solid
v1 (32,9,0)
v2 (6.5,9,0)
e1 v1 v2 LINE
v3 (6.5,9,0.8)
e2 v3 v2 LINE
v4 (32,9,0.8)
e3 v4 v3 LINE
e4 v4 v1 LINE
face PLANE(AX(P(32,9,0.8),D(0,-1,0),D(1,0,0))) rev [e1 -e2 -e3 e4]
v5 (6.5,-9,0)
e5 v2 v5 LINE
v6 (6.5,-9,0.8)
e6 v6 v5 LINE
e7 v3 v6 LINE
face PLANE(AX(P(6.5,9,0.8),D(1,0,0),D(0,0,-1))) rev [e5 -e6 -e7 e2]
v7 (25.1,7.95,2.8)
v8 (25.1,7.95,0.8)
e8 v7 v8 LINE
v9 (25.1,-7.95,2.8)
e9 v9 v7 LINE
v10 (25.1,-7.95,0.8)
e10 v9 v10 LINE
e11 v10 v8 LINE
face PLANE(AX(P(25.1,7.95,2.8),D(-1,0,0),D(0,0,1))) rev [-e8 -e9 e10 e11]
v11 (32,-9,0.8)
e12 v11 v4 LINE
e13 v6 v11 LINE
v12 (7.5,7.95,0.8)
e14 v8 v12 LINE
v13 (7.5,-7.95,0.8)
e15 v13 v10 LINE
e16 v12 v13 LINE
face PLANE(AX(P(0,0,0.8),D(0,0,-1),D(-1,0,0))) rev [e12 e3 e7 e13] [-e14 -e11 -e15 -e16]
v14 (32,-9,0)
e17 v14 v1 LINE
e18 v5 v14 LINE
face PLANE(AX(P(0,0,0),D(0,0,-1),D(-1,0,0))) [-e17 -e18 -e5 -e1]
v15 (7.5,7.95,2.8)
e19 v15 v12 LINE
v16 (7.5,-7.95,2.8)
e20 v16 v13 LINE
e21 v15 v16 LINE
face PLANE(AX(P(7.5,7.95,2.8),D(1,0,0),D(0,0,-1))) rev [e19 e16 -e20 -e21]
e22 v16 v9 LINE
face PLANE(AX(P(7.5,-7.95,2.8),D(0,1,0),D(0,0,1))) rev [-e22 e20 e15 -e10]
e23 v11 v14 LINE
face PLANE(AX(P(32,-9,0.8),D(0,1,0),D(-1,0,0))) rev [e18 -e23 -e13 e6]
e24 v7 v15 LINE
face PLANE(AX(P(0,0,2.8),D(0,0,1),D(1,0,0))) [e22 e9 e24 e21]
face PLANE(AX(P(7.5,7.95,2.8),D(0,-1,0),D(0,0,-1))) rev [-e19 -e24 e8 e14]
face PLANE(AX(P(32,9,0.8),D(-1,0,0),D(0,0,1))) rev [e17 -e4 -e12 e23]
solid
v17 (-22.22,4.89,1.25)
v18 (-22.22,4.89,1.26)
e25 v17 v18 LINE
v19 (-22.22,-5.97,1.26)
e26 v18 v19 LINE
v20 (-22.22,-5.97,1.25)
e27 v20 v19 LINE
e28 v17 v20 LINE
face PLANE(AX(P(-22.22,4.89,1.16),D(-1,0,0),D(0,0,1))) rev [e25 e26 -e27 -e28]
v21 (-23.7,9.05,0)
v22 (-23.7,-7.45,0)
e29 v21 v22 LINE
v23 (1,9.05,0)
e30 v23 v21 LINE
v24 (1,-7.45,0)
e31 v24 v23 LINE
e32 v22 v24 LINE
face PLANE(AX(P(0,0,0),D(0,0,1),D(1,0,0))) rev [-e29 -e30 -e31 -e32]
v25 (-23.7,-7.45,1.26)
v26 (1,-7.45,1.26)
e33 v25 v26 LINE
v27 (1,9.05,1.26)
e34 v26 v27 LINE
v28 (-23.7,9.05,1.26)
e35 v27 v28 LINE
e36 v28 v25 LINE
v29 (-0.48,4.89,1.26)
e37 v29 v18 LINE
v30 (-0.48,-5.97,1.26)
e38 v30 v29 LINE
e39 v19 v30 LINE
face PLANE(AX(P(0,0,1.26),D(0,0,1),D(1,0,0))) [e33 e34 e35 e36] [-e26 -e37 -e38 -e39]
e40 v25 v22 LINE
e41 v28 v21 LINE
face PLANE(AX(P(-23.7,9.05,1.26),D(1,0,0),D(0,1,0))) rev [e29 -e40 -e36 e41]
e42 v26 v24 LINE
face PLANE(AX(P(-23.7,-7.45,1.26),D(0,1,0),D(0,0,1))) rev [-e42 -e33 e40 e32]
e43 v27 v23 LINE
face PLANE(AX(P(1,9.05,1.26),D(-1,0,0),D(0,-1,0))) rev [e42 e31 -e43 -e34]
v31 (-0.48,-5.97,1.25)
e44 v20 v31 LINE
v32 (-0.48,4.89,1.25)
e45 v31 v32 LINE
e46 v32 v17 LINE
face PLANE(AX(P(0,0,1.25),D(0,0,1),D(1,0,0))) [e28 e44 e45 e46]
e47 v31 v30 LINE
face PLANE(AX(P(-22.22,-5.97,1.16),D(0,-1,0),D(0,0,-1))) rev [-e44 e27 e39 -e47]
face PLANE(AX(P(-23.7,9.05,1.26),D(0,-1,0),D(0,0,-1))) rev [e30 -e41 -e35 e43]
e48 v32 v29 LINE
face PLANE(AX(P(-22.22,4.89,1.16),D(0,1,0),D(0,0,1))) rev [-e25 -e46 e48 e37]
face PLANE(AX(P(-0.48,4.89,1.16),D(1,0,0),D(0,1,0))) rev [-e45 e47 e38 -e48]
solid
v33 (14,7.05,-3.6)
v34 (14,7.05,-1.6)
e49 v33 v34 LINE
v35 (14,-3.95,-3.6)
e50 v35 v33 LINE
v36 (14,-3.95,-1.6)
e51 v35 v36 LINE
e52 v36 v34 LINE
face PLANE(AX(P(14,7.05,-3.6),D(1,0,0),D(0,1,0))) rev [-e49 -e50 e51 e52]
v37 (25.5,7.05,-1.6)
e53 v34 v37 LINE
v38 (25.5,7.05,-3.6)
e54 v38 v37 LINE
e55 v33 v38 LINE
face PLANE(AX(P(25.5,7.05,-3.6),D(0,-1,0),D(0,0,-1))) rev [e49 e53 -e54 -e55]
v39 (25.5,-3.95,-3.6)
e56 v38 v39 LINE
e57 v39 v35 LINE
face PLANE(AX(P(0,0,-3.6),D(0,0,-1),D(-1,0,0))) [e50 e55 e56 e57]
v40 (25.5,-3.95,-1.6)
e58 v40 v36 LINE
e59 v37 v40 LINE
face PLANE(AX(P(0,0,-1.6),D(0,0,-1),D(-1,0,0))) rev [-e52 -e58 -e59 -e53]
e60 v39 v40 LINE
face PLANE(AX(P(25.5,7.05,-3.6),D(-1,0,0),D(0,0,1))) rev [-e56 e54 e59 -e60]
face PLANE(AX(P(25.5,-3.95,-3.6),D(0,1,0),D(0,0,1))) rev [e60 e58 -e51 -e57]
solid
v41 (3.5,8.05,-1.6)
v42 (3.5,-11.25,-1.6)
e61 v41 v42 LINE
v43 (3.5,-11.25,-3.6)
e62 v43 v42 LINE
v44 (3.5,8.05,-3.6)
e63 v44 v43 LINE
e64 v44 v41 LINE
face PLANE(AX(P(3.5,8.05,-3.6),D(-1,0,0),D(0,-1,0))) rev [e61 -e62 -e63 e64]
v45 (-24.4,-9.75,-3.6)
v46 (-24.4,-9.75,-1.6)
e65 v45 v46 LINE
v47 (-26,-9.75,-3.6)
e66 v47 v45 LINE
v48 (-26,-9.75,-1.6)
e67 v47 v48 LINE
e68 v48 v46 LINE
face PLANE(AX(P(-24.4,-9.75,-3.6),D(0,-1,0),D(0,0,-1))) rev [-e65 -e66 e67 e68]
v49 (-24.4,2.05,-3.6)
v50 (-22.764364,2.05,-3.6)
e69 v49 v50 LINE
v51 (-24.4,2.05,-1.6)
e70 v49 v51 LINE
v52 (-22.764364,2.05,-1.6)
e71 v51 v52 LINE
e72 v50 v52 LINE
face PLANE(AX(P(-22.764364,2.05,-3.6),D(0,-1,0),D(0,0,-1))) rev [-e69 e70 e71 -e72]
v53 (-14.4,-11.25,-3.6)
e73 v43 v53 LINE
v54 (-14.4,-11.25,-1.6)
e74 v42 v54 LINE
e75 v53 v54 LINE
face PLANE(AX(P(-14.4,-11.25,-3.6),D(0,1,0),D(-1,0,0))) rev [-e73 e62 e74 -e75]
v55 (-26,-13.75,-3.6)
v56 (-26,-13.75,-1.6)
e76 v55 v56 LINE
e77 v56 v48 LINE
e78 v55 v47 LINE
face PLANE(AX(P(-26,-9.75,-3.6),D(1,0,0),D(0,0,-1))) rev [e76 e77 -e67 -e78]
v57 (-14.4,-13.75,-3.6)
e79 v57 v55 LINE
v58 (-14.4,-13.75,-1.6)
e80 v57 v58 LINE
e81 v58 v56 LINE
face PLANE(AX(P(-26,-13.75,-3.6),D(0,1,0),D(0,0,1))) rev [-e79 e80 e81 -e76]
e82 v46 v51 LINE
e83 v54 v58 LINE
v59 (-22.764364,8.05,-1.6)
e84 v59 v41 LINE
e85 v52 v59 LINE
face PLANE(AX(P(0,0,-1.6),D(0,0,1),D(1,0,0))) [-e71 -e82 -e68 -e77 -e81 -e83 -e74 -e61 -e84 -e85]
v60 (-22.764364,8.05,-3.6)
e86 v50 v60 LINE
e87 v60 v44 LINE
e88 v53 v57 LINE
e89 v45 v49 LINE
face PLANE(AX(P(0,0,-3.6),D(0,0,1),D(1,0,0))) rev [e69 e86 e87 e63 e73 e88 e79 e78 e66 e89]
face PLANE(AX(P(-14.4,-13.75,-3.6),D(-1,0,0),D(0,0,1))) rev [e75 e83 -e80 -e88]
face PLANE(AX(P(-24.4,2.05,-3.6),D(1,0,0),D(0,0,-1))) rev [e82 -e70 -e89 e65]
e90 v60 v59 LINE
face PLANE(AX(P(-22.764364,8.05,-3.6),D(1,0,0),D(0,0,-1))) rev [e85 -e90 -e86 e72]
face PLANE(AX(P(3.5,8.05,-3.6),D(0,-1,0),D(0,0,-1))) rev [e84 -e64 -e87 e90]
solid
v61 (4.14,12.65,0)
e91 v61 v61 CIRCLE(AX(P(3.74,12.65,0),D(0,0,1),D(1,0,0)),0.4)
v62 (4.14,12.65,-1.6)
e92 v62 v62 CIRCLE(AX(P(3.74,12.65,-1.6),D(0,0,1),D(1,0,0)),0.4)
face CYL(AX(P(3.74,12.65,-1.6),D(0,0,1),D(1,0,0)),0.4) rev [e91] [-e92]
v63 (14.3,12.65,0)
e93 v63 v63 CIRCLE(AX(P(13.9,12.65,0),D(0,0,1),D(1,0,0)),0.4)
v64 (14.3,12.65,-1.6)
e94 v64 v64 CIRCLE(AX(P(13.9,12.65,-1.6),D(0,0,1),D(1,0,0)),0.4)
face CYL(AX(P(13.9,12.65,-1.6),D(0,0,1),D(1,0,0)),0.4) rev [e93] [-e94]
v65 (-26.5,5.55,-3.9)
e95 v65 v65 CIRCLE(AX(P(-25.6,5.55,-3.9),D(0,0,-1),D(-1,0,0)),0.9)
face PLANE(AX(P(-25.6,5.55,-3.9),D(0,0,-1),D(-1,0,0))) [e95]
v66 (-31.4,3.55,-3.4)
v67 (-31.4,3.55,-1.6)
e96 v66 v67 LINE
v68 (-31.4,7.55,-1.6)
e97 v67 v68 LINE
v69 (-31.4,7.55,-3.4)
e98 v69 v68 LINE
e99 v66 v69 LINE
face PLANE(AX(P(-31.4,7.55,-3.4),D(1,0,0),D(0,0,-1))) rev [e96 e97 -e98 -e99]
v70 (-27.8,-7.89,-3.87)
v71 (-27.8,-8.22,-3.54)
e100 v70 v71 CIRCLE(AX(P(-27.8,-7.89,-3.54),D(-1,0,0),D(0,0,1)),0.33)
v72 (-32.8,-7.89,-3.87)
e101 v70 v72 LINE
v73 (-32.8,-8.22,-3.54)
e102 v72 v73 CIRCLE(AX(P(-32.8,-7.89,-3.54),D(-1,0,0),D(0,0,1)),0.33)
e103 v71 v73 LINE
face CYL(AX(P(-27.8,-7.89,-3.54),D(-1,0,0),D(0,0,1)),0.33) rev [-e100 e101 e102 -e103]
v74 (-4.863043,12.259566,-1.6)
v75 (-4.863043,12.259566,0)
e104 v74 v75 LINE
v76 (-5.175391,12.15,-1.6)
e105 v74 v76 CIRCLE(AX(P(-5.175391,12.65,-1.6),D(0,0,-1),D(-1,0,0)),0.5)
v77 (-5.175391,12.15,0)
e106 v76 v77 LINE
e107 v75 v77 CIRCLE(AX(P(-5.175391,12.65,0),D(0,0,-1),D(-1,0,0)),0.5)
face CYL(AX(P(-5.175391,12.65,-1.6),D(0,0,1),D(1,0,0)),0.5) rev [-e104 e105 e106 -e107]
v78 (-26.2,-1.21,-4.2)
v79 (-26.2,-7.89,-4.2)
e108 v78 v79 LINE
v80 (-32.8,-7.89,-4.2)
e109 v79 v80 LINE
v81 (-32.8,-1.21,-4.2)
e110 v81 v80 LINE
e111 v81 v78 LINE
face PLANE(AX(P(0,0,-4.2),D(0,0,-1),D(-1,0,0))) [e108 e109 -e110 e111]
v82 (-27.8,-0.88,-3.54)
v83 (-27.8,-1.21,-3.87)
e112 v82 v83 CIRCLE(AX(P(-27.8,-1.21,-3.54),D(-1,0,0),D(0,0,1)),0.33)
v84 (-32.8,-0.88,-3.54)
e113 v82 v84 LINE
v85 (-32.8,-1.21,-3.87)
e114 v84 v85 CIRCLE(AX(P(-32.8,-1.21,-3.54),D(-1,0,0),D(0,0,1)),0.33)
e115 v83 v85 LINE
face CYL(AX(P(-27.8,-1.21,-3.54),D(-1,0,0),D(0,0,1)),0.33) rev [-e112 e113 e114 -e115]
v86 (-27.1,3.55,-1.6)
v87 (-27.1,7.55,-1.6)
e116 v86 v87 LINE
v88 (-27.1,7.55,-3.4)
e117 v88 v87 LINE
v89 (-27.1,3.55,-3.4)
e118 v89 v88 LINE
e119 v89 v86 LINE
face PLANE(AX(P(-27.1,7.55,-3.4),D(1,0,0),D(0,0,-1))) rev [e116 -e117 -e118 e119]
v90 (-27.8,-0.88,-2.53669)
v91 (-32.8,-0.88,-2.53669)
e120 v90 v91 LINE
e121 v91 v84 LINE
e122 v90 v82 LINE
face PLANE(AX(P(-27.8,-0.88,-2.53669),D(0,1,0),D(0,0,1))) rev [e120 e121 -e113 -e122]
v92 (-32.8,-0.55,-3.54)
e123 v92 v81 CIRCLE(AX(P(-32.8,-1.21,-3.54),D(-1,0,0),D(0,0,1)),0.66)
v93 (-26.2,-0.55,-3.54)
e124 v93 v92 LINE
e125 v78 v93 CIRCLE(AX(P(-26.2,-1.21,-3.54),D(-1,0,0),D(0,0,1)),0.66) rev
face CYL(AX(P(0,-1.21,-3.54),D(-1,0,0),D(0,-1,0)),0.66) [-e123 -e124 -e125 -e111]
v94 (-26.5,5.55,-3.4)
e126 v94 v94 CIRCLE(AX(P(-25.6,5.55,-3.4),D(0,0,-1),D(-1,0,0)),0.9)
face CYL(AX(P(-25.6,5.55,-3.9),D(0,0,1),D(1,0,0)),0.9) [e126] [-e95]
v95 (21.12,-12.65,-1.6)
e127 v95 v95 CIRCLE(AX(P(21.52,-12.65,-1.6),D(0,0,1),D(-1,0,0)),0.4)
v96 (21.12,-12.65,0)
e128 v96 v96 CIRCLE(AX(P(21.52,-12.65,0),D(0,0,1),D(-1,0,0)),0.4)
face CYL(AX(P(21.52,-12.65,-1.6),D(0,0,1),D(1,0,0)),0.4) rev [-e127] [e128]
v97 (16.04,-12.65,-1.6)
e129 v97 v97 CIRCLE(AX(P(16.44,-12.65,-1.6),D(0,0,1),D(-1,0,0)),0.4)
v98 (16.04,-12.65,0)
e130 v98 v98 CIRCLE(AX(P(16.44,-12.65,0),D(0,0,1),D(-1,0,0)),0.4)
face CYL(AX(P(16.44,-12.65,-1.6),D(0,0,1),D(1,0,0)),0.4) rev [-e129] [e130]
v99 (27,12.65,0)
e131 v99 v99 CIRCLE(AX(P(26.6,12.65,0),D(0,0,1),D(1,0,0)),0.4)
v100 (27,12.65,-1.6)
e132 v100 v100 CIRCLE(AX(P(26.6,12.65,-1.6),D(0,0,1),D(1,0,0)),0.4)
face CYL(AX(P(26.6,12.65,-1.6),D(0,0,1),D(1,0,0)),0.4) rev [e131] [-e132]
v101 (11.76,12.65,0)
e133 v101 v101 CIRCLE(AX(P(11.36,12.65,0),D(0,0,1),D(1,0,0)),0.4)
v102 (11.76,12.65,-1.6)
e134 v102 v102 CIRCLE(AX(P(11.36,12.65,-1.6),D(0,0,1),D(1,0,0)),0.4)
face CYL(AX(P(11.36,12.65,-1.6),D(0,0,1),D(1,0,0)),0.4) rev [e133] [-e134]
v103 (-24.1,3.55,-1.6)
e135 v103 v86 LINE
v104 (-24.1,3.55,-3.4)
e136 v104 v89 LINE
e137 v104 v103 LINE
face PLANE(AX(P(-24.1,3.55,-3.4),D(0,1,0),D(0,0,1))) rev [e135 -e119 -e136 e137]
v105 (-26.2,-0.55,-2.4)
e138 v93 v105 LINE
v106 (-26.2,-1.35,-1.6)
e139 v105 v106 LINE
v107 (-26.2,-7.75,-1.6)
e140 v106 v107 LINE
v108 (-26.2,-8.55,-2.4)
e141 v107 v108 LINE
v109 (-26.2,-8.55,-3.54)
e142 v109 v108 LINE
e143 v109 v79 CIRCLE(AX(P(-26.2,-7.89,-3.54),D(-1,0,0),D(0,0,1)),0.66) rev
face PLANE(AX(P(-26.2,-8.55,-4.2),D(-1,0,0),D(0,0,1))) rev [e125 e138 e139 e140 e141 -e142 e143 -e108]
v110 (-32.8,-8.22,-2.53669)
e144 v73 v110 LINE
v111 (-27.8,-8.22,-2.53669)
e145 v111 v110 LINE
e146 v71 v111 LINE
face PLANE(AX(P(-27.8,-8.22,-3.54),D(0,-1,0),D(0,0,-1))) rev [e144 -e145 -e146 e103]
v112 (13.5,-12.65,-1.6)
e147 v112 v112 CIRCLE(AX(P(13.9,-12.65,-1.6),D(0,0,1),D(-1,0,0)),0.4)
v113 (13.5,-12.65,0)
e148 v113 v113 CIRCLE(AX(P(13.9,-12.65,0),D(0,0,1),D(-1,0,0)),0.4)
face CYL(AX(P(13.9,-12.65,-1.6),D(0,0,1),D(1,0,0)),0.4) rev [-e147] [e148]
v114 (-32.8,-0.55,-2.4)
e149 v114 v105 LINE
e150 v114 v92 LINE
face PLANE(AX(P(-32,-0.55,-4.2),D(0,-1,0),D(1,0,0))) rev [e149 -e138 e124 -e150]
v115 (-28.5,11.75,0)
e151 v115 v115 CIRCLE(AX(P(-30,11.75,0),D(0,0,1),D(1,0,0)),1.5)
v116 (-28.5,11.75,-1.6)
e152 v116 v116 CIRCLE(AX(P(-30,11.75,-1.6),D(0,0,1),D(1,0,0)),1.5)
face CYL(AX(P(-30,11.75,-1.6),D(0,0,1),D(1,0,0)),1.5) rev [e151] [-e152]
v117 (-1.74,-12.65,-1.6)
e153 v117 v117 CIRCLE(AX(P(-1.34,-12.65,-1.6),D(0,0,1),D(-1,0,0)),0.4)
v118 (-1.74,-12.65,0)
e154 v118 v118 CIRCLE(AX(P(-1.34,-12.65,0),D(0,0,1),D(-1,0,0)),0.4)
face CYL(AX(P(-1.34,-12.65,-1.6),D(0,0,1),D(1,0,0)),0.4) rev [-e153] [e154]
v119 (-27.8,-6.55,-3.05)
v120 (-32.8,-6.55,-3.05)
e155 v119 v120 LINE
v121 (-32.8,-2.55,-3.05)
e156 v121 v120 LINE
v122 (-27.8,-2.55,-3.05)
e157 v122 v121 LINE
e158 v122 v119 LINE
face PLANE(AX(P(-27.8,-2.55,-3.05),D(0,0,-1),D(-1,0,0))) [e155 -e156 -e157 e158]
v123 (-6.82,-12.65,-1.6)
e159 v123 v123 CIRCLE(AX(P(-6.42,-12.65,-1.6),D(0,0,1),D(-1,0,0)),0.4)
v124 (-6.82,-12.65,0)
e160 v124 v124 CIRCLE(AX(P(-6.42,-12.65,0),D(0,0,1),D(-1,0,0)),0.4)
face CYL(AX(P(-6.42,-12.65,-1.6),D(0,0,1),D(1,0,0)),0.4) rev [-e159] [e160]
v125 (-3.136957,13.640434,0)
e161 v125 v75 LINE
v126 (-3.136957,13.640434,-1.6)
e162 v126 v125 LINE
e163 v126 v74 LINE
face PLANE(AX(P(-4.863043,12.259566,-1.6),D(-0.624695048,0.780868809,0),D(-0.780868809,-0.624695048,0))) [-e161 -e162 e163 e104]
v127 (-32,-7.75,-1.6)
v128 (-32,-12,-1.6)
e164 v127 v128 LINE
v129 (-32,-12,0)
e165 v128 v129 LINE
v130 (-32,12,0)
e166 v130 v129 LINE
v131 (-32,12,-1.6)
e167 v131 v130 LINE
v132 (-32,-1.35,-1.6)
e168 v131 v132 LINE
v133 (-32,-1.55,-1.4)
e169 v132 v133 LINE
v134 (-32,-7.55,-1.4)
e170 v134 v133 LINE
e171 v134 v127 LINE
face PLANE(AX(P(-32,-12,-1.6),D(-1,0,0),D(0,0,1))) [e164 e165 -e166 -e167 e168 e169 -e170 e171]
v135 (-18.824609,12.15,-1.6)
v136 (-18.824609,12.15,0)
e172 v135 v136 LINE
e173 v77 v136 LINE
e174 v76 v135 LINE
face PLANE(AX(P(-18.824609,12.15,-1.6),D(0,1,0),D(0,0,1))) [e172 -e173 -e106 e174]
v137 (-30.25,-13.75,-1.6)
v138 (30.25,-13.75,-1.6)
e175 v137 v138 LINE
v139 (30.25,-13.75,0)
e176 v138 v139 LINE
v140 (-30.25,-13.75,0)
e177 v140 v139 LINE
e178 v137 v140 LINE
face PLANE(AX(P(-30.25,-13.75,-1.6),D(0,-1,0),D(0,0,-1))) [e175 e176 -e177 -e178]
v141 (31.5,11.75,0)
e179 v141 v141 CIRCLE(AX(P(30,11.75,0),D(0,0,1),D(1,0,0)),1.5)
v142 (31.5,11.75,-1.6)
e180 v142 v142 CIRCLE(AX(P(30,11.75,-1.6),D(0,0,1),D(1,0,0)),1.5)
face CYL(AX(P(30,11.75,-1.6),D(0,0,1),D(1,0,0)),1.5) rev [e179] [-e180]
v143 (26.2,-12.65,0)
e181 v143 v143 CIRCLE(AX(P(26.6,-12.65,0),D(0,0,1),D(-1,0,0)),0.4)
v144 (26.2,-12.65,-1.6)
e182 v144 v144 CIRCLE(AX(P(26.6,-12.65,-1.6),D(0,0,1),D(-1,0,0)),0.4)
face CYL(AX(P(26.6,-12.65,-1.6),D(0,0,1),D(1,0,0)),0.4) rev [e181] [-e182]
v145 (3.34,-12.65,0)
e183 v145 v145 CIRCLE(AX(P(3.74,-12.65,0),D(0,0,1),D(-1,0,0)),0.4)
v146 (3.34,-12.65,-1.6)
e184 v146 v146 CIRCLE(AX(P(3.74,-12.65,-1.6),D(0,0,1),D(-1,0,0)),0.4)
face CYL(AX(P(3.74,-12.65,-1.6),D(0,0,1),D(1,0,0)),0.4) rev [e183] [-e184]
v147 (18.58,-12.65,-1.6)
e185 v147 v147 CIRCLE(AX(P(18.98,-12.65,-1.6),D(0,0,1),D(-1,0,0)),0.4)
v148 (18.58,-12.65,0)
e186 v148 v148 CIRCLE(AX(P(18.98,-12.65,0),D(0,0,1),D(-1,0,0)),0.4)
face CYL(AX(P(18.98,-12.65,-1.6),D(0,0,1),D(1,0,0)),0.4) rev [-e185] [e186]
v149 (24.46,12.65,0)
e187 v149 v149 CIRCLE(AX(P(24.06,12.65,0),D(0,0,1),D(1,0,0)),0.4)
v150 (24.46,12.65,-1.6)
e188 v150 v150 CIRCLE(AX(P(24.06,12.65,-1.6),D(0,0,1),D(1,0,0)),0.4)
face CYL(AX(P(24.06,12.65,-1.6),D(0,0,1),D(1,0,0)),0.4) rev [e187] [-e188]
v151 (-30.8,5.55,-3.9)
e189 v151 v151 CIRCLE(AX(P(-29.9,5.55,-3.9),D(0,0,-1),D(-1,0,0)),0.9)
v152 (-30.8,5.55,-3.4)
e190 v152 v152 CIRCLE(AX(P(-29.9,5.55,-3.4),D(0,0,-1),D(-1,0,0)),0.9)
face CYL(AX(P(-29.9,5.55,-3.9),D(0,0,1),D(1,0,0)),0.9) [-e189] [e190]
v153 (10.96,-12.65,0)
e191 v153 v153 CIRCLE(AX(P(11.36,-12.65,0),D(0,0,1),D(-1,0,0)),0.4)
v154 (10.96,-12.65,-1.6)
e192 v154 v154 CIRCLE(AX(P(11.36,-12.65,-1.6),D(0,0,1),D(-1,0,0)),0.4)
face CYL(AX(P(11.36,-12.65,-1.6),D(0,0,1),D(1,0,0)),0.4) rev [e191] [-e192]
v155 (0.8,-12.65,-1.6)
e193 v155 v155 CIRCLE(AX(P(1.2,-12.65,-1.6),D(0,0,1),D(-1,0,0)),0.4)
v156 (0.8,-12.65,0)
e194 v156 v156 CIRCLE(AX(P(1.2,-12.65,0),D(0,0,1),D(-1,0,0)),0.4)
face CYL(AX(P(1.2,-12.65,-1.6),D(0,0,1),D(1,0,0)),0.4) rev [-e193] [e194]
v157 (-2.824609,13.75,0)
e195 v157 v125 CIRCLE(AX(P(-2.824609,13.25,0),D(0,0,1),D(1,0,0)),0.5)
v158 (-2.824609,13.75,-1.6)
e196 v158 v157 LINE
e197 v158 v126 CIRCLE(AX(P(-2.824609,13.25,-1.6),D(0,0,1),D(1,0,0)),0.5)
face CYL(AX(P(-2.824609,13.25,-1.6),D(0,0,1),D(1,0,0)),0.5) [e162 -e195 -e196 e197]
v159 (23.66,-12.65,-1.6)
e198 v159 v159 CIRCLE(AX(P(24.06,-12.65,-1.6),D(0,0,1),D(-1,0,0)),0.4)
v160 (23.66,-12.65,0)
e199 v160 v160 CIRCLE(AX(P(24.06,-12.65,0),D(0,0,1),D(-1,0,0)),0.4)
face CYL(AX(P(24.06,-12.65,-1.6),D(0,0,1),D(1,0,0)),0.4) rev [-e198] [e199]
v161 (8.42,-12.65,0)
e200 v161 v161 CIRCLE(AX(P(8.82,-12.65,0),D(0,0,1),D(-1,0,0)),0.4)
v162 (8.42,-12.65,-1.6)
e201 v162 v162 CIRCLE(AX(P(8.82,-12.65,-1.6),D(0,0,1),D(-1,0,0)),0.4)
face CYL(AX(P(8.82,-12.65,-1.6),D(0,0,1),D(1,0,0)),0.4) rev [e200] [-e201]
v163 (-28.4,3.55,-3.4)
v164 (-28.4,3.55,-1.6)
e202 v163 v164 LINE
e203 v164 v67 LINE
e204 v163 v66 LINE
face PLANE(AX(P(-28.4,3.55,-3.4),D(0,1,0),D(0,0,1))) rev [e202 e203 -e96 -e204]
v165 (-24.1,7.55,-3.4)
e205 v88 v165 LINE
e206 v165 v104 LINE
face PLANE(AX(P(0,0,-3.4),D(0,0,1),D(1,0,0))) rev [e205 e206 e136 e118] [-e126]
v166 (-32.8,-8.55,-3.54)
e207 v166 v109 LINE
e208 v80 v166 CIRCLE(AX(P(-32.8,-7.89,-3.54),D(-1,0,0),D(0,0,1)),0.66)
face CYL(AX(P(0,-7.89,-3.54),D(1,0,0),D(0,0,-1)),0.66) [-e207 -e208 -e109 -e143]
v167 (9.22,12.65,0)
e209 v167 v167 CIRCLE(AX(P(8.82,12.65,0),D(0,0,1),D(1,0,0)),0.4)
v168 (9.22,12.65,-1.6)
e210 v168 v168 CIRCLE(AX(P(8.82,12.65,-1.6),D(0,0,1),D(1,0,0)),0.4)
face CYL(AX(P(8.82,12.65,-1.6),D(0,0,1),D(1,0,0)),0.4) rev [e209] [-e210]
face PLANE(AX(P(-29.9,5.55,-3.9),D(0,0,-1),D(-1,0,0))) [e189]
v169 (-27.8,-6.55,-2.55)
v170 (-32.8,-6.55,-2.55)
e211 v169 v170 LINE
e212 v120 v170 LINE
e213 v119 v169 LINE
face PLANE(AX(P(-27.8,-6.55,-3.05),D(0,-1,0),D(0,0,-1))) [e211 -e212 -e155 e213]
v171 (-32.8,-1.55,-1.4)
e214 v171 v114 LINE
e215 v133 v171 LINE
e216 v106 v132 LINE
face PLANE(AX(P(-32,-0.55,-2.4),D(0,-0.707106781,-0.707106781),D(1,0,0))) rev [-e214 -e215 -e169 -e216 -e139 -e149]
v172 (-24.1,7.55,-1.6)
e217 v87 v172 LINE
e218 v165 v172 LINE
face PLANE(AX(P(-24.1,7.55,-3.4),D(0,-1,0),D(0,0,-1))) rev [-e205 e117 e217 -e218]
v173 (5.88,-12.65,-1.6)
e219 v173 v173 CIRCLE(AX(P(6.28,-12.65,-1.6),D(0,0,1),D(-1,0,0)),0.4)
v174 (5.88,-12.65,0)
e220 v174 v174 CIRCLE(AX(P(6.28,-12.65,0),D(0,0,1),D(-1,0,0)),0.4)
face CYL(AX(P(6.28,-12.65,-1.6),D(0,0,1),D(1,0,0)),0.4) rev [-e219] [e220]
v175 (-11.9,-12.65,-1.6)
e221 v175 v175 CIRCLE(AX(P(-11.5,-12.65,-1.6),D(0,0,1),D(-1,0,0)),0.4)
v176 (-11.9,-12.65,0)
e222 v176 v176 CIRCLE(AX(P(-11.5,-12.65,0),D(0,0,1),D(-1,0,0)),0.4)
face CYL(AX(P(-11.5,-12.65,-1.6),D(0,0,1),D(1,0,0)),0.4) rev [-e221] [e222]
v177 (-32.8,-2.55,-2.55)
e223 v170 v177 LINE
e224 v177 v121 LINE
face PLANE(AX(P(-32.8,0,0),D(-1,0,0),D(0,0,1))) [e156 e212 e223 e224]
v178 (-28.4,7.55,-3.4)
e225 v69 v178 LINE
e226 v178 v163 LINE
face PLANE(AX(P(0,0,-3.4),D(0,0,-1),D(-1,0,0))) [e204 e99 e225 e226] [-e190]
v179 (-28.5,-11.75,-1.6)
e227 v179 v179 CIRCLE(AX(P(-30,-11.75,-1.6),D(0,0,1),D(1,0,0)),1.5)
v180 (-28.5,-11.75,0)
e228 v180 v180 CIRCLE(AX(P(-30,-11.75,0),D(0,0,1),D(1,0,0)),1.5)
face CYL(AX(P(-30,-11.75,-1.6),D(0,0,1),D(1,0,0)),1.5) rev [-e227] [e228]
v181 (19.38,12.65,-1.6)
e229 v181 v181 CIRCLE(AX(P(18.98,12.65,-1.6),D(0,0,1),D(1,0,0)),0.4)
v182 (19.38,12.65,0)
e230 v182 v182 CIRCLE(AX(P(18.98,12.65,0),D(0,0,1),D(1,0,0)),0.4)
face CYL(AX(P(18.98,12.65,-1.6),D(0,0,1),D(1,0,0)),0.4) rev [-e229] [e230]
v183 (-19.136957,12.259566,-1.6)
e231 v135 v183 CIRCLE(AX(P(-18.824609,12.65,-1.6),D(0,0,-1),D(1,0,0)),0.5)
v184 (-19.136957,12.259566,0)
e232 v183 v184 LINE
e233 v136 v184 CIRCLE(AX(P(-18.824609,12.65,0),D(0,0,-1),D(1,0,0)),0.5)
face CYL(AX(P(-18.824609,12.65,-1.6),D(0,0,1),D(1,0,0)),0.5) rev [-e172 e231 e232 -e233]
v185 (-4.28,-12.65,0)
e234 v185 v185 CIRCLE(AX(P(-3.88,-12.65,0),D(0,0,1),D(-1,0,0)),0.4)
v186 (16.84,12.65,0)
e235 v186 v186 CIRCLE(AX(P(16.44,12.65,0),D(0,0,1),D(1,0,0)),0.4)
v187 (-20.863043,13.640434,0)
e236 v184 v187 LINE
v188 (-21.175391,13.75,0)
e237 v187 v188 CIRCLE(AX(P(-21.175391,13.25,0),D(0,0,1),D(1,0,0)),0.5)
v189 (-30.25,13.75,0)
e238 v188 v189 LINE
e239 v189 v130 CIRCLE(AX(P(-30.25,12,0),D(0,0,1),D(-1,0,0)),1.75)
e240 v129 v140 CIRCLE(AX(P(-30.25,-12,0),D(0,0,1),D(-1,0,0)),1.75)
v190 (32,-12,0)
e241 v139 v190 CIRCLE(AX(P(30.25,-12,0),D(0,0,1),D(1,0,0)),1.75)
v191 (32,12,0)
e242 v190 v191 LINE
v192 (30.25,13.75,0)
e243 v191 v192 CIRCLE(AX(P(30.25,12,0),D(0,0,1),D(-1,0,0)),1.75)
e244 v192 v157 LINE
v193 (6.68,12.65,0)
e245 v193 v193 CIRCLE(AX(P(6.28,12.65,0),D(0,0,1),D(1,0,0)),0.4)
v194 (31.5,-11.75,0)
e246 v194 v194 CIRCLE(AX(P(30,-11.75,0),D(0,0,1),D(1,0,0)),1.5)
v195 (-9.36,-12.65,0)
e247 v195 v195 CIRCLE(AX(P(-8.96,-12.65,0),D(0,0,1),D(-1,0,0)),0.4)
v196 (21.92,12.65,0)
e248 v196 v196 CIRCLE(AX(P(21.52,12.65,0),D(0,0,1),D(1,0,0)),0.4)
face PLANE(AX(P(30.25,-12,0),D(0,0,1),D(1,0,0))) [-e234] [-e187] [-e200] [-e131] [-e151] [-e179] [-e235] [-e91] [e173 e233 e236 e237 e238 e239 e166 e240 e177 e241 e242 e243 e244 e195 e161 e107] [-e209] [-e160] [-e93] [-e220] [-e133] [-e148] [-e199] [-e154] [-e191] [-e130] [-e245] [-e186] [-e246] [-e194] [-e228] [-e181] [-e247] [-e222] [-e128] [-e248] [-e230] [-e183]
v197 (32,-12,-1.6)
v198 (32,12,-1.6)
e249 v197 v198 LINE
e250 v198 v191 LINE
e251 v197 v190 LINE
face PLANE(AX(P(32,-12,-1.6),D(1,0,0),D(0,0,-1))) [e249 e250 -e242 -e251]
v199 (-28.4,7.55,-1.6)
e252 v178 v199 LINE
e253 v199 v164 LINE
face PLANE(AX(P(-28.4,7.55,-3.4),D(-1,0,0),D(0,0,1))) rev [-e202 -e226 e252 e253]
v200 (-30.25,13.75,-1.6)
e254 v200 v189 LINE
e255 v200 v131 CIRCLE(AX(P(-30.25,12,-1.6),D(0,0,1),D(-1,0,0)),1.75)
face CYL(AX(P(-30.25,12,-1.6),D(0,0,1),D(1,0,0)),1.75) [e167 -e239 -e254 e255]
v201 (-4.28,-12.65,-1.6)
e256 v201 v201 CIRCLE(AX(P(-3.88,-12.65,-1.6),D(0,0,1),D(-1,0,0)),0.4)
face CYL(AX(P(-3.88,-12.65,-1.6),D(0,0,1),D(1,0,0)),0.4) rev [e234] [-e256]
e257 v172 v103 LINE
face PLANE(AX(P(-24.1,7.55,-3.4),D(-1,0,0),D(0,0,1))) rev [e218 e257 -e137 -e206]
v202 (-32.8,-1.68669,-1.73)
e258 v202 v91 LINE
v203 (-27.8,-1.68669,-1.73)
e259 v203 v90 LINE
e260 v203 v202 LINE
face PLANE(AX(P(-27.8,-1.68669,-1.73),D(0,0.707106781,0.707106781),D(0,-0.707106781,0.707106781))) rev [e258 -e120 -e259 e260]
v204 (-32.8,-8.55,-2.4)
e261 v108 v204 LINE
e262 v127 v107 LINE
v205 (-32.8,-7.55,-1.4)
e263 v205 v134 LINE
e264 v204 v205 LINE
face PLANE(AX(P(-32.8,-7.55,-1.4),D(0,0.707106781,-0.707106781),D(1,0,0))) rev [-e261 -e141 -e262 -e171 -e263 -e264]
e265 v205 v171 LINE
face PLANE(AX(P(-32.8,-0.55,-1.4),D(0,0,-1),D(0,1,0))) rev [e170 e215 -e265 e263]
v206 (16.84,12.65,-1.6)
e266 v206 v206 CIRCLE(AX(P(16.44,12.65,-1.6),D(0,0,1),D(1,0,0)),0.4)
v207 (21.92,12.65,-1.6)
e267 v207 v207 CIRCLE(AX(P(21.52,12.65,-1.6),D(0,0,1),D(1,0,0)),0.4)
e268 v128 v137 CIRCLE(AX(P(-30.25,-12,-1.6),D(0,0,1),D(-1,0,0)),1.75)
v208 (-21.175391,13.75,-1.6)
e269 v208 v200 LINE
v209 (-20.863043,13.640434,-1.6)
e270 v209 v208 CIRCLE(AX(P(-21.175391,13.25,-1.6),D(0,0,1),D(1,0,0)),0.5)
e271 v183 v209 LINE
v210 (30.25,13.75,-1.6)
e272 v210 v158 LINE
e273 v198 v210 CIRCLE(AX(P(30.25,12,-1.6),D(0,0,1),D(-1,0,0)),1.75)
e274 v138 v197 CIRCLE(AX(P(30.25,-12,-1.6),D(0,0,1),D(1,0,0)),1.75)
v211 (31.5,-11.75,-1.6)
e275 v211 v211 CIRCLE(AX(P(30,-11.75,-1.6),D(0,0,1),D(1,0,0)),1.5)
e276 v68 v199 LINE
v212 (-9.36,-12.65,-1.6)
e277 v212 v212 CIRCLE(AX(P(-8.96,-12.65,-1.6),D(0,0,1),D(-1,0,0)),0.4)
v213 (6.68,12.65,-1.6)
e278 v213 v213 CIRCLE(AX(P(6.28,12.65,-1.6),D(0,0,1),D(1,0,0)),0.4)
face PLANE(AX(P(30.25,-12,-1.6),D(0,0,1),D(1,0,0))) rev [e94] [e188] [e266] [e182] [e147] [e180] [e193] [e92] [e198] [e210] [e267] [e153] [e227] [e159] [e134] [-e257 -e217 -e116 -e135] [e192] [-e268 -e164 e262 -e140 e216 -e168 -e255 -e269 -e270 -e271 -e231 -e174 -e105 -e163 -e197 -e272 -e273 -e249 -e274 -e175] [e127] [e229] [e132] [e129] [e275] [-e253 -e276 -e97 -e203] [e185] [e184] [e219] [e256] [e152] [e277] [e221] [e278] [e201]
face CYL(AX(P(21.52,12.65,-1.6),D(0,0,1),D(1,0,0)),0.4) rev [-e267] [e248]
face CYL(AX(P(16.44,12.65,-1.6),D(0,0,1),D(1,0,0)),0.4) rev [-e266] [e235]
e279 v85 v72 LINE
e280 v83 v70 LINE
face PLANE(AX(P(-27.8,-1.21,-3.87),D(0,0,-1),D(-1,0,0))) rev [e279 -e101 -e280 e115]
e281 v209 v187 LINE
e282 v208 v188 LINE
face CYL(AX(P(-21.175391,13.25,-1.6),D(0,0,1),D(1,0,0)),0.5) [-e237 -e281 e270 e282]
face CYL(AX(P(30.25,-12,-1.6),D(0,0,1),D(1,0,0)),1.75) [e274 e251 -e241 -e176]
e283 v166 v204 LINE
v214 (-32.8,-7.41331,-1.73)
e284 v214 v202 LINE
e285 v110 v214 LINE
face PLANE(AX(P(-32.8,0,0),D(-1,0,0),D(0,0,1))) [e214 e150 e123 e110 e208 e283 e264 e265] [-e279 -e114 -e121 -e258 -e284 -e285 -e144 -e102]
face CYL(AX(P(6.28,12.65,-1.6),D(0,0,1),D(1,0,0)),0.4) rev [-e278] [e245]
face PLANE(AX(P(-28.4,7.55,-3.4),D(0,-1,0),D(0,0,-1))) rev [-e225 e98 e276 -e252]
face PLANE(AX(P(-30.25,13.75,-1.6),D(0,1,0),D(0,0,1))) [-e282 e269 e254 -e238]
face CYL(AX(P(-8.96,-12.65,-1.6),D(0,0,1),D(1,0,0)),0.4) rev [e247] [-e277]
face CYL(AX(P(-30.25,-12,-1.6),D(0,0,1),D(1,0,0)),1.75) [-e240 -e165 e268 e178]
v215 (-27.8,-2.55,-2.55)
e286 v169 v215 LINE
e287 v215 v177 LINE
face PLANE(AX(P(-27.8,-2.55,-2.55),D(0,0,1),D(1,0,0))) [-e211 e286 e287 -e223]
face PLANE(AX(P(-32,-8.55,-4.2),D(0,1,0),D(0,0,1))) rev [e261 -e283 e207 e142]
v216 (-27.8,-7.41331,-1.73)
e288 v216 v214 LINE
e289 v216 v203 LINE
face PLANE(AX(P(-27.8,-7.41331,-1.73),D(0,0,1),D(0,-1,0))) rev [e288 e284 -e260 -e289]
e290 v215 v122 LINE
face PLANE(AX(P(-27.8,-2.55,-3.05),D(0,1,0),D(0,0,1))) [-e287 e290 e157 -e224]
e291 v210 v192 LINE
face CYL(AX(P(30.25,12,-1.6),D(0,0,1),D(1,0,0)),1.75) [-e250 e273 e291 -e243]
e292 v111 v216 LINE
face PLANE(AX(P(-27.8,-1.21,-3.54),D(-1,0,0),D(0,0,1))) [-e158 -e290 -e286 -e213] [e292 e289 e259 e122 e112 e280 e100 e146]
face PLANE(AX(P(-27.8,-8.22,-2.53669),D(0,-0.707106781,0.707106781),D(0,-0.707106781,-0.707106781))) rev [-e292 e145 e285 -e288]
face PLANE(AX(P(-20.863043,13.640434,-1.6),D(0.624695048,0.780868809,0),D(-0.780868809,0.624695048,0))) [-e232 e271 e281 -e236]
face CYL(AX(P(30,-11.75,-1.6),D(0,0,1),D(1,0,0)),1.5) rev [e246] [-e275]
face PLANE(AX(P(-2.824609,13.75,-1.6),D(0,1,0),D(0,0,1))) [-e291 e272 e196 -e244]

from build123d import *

# Parameters (mm, degrees)
ESQUISSE1_R             = 1.5
ESQUISSE1_R_2           = 0.4
BOSS_EXTRU_1_DEPTH      = 1.6
ESQUISSE2_W             = 25.5
ESQUISSE2_H             = 18
BOSS_EXTRU_2_DEPTH      = 0.8
ESQUISSE3_W             = 17.6
ESQUISSE3_H             = 15.9
BOSS_EXTRU_3_DEPTH      = 2
ESQUISSE4_W             = 24.7
ESQUISSE4_H             = 16.5
BOSS_EXTRU_4_DEPTH      = 1.26
ESQUISSE5_W             = 21.74
ESQUISSE5_H             = 10.86
ENL_V_MAT_EXTRU_1_DEPTH = 0.1
D_PLACER_LA_FACE2_BY    = 0.09
ESQUISSE7_W             = 5.8
ESQUISSE7_H             = 8
BOSS_EXTRU_5_DEPTH      = 2.6
ESQUISSE8_W             = 2.8
ESQUISSE8_H             = 8
BOSS_EXTRU_6_DEPTH      = 0.8
CONG_1_R                = 0.66
ESQUISSE9_W             = 0.5
ESQUISSE9_H             = 4
ENL_V_MAT_EXTRU_2_DEPTH = 5
ESQUISSE10_W            = 3
ESQUISSE10_H            = 4
BOSS_EXTRU_7_DEPTH      = 1.8
ESQUISSE11_R            = 0.9
BOSS_EXTRU_8_DEPTH      = 0.5
BOSS_EXTRU_9_DEPTH      = 2
ESQUISSE12_W            = 11.5
ESQUISSE12_H            = 11
BOSS_EXTRU_9_2_DEPTH    = 2


with BuildPart() as part:
    # Esquisse1 → Boss.-Extru.1 (new body)
    with BuildSketch(Plane.XY):
        with BuildLine():
            Line((-20.863043006, 13.640434405), (-19.136956994, 12.259565595))
            ThreePointArc((-19.136956994, 12.259565595), (-18.990112941, 12.17818584), (-18.82460947, 12.15))
            Line((-18.82460947, 12.15), (-5.17539053, 12.15))
            ThreePointArc((-5.17539053, 12.15), (-5.009887059, 12.17818584), (-4.863043006, 12.259565595))
            Line((-4.863043006, 12.259565595), (-3.136956994, 13.640434405))
            ThreePointArc((-3.136956994, 13.640434405), (-2.990112941, 13.72181416), (-2.82460947, 13.75))
            Line((-2.82460947, 13.75), (30.25, 13.75))
            ThreePointArc((30.25, 13.75), (31.487436867, 13.237436867), (32, 12))
            Line((32, 12), (32, -12))
            ThreePointArc((32, -12), (31.487436867, -13.237436867), (30.25, -13.75))
            Line((30.25, -13.75), (-30.25, -13.75))
            ThreePointArc((-30.25, -13.75), (-31.487436867, -13.237436867), (-32, -12))
            Line((-32, -12), (-32, 12))
            ThreePointArc((-32, 12), (-31.487436867, 13.237436867), (-30.25, 13.75))
            Line((-30.25, 13.75), (-21.17539053, 13.75))
            ThreePointArc((-21.17539053, 13.75), (-21.009887059, 13.72181416), (-20.863043006, 13.640434405))
        make_face()
        with Locations((30, 11.75)):
            Circle(ESQUISSE1_R, mode=Mode.SUBTRACT)
        with Locations((30, -11.75)):
            Circle(ESQUISSE1_R, mode=Mode.SUBTRACT)
        with Locations((-30, -11.75)):
            Circle(ESQUISSE1_R, mode=Mode.SUBTRACT)
        with Locations((-30, 11.75)):
            Circle(ESQUISSE1_R, mode=Mode.SUBTRACT)
        with Locations((26.6, 12.65)):
            Circle(ESQUISSE1_R_2, mode=Mode.SUBTRACT)
        with Locations((24.06, 12.65)):
            Circle(ESQUISSE1_R_2, mode=Mode.SUBTRACT)
        with Locations((21.52, 12.65)):
            Circle(ESQUISSE1_R_2, mode=Mode.SUBTRACT)
        with Locations((18.98, 12.65)):
            Circle(ESQUISSE1_R_2, mode=Mode.SUBTRACT)
        with Locations((16.44, 12.65)):
            Circle(ESQUISSE1_R_2, mode=Mode.SUBTRACT)
        with Locations((13.9, 12.65)):
            Circle(ESQUISSE1_R_2, mode=Mode.SUBTRACT)
        with Locations((11.36, 12.65)):
            Circle(ESQUISSE1_R_2, mode=Mode.SUBTRACT)
        with Locations((8.82, 12.65)):
            Circle(ESQUISSE1_R_2, mode=Mode.SUBTRACT)
        with Locations((6.28, 12.65)):
            Circle(ESQUISSE1_R_2, mode=Mode.SUBTRACT)
        with Locations((3.74, 12.65)):
            Circle(ESQUISSE1_R_2, mode=Mode.SUBTRACT)
        with Locations(Location((26.6, -12.65, 0), (0, 0, 180))):
            Circle(ESQUISSE1_R_2, mode=Mode.SUBTRACT)
        with Locations(Location((24.06, -12.65, 0), (0, 0, 180))):
            Circle(ESQUISSE1_R_2, mode=Mode.SUBTRACT)
        with Locations(Location((21.52, -12.65, 0), (0, 0, 180))):
            Circle(ESQUISSE1_R_2, mode=Mode.SUBTRACT)
        with Locations(Location((18.98, -12.65, 0), (0, 0, 180))):
            Circle(ESQUISSE1_R_2, mode=Mode.SUBTRACT)
        with Locations(Location((16.44, -12.65, 0), (0, 0, 180))):
            Circle(ESQUISSE1_R_2, mode=Mode.SUBTRACT)
        with Locations(Location((13.9, -12.65, 0), (0, 0, 180))):
            Circle(ESQUISSE1_R_2, mode=Mode.SUBTRACT)
        with Locations(Location((11.36, -12.65, 0), (0, 0, 180))):
            Circle(ESQUISSE1_R_2, mode=Mode.SUBTRACT)
        with Locations(Location((8.82, -12.65, 0), (0, 0, 180))):
            Circle(ESQUISSE1_R_2, mode=Mode.SUBTRACT)
        with Locations(Location((6.28, -12.65, 0), (0, 0, 180))):
            Circle(ESQUISSE1_R_2, mode=Mode.SUBTRACT)
        with Locations(Location((3.74, -12.65, 0), (0, 0, 180))):
            Circle(ESQUISSE1_R_2, mode=Mode.SUBTRACT)
        with Locations(Location((1.2, -12.65, 0), (0, 0, 180))):
            Circle(ESQUISSE1_R_2, mode=Mode.SUBTRACT)
        with Locations(Location((-1.34, -12.65, 0), (0, 0, 180))):
            Circle(ESQUISSE1_R_2, mode=Mode.SUBTRACT)
        with Locations(Location((-3.88, -12.65, 0), (0, 0, 180))):
            Circle(ESQUISSE1_R_2, mode=Mode.SUBTRACT)
        with Locations(Location((-6.42, -12.65, 0), (0, 0, 180))):
            Circle(ESQUISSE1_R_2, mode=Mode.SUBTRACT)
        with Locations(Location((-8.96, -12.65, 0), (0, 0, 180))):
            Circle(ESQUISSE1_R_2, mode=Mode.SUBTRACT)
        with Locations(Location((-11.5, -12.65, 0), (0, 0, 180))):
            Circle(ESQUISSE1_R_2, mode=Mode.SUBTRACT)
    extrude(amount=-BOSS_EXTRU_1_DEPTH)

    # Esquisse7 → Boss.-Extru.5 (add)
    with BuildSketch(Plane(origin=(0, 0, -1.6), x_dir=(-1, 0, 0), z_dir=(0, 0, -1))):
        with Locations((29.1, -4.55)):
            Rectangle(ESQUISSE7_W, ESQUISSE7_H)
    extrude(amount=BOSS_EXTRU_5_DEPTH)

    # Esquisse8 → Boss.-Extru.6 (add)
    with BuildSketch(Plane.ZY.offset(32)):
        with Locations((-2.8, -4.55)):
            Rectangle(ESQUISSE8_W, ESQUISSE8_H)
    extrude(amount=BOSS_EXTRU_6_DEPTH)

    # Congé1
    cong_1_edges = [part.edges().sort_by_distance(p)[0] for p in [
        (-29.5, -0.55, -4.2),
        (-29.5, -8.55, -4.2),
    ]]
    fillet(cong_1_edges, radius=CONG_1_R)

    # Chanfrein1
    # the kernel refuses this chamfer: 1 mm, written as the material it takes off along each edge
    with BuildSketch(Plane(origin=(-25.827960829, -0.55, -1.4), x_dir=(0, -0.9996219169112968, 0.027495876610586282), z_dir=(-1, 0, 0))) as chanfrein1_piece_1_section:
        with BuildLine():
            Line((1.028673195, 0), (-0.056547155, -1.027117794))
            Line((-0.056547155, -1.027117794), (-0.076539593, -1.026567876))
            ThreePointArc((-0.076539593, -1.026567876), (-0.034129227, -0.51339783), (-0.019992438, 0.000549918))
            Line((-0.019992438, 0.000549918), (0.000549918, 0.019992438))
            ThreePointArc((0.000549918, 0.019992438), (0.514497665, 0.00585565), (1.029223113, 0.019992438))
            Line((1.029223113, 0.019992438), (1.028673195, 0))
        make_face()
    chanfrein1_piece_1 = extrude(amount=13.144078342, mode=Mode.PRIVATE)
    chanfrein1_piece_1 = split(chanfrein1_piece_1, bisect_by=Plane(origin=(-32, -0.79899688, -1.880740252), z_dir=(1, 0, 0)), keep=Keep.TOP, mode=Mode.PRIVATE)
    chanfrein1_piece_1 = split(chanfrein1_piece_1, bisect_by=Plane(origin=(-28.913980414, -0.79899688, -1.6), z_dir=(0, 0, -1)), keep=Keep.TOP, mode=Mode.PRIVATE)
    add(chanfrein1_piece_1, mode=Mode.SUBTRACT)
    with BuildSketch(Plane(origin=(-32, -0.55, -1.4), x_dir=(0, -0.9996219169112968, 0.027495876610586282), z_dir=(-1, 0, 0))) as chanfrein1_piece_2_section:
        with BuildLine():
            Line((1.028673195, 0), (-0.056547155, -1.027117794))
            Line((-0.056547155, -1.027117794), (-0.076539593, -1.026567876))
            ThreePointArc((-0.076539593, -1.026567876), (-0.034129227, -0.51339783), (-0.019992438, 0.000549918))
            Line((-0.019992438, 0.000549918), (0.000549918, 0.019992438))
            ThreePointArc((0.000549918, 0.019992438), (0.514497665, 0.00585565), (1.029223113, 0.019992438))
            Line((1.029223113, 0.019992438), (1.028673195, 0))
        make_face()
    chanfrein1_piece_2 = extrude(amount=6.972039171, mode=Mode.PRIVATE)
    chanfrein1_piece_2 = split(chanfrein1_piece_2, bisect_by=Plane(origin=(-35.486019586, -1.011905027, -1.6), z_dir=(0, 0, 1)), keep=Keep.TOP, mode=Mode.PRIVATE)
    add(chanfrein1_piece_2, mode=Mode.SUBTRACT)
    with BuildSketch(Plane(origin=(-32, -0.55, -1.4), x_dir=(0, -0.9996219169112968, 0.027495876610586282), z_dir=(-1, 0, 0))) as chanfrein1_piece_3_section:
        with BuildLine():
            Line((1.028673195, 0), (-0.056547155, -1.027117794))
            Line((-0.056547155, -1.027117794), (-0.076539593, -1.026567876))
            ThreePointArc((-0.076539593, -1.026567876), (-0.034129227, -0.51339783), (-0.019992438, 0.000549918))
            Line((-0.019992438, 0.000549918), (0.000549918, 0.019992438))
            ThreePointArc((0.000549918, 0.019992438), (0.514497665, 0.00585565), (1.029223113, 0.019992438))
            Line((1.029223113, 0.019992438), (1.028673195, 0))
        make_face()
    chanfrein1_piece_3 = extrude(amount=6.972039171, mode=Mode.PRIVATE)
    chanfrein1_piece_3 = split(chanfrein1_piece_3, bisect_by=Plane(origin=(-35.486019586, -0.79899688, -1.6), z_dir=(0, 0, -1)), keep=Keep.TOP, mode=Mode.PRIVATE)
    add(chanfrein1_piece_3, mode=Mode.SUBTRACT)
    with BuildSketch(Plane(origin=(-25.827960829, -8.55, -1.4), x_dir=(0, -0.02749587661058563, -0.9996219169112968), z_dir=(-1, 0, 0))) as chanfrein1_piece_4_section:
        with BuildLine():
            Line((1.028673195, 0), (-0.056547155, -1.027117794))
            Line((-0.056547155, -1.027117794), (-0.076539593, -1.026567876))
            ThreePointArc((-0.076539593, -1.026567876), (-0.034129227, -0.51339783), (-0.019992438, 0.000549918))
            Line((-0.019992438, 0.000549918), (0.000549918, 0.019992438))
            ThreePointArc((0.000549918, 0.019992438), (0.514497665, 0.00585565), (1.029223113, 0.019992438))
            Line((1.029223113, 0.019992438), (1.028673195, 0))
        make_face()
    chanfrein1_piece_4 = extrude(amount=13.144078342, mode=Mode.PRIVATE)
    chanfrein1_piece_4 = split(chanfrein1_piece_4, bisect_by=Plane(origin=(-32, -8.30100312, -1.880740252), z_dir=(1, 0, 0)), keep=Keep.TOP, mode=Mode.PRIVATE)
    chanfrein1_piece_4 = split(chanfrein1_piece_4, bisect_by=Plane(origin=(-28.913980414, -8.30100312, -1.6), z_dir=(0, 0, -1)), keep=Keep.TOP, mode=Mode.PRIVATE)
    add(chanfrein1_piece_4, mode=Mode.SUBTRACT)
    with BuildSketch(Plane(origin=(-32, -8.55, -1.4), x_dir=(0, -0.02749587661058563, -0.9996219169112968), z_dir=(-1, 0, 0))) as chanfrein1_piece_5_section:
        with BuildLine():
            Line((1.028673195, 0), (-0.056547155, -1.027117794))
            Line((-0.056547155, -1.027117794), (-0.076539593, -1.026567876))
            ThreePointArc((-0.076539593, -1.026567876), (-0.034129227, -0.51339783), (-0.019992438, 0.000549918))
            Line((-0.019992438, 0.000549918), (0.000549918, 0.019992438))
            ThreePointArc((0.000549918, 0.019992438), (0.514497665, 0.00585565), (1.029223113, 0.019992438))
            Line((1.029223113, 0.019992438), (1.028673195, 0))
        make_face()
    chanfrein1_piece_5 = extrude(amount=6.972039171, mode=Mode.PRIVATE)
    chanfrein1_piece_5 = split(chanfrein1_piece_5, bisect_by=Plane(origin=(-35.486019586, -8.30100312, -1.6), z_dir=(0, 0, -1)), keep=Keep.TOP, mode=Mode.PRIVATE)
    add(chanfrein1_piece_5, mode=Mode.SUBTRACT)
    with BuildSketch(Plane(origin=(-32, -8.55, -1.4), x_dir=(0, -0.02749587661058563, -0.9996219169112968), z_dir=(-1, 0, 0))) as chanfrein1_piece_6_section:
        with BuildLine():
            Line((1.028673195, 0), (-0.056547155, -1.027117794))
            Line((-0.056547155, -1.027117794), (-0.076539593, -1.026567876))
            ThreePointArc((-0.076539593, -1.026567876), (-0.034129227, -0.51339783), (-0.019992438, 0.000549918))
            Line((-0.019992438, 0.000549918), (0.000549918, 0.019992438))
            ThreePointArc((0.000549918, 0.019992438), (0.514497665, 0.00585565), (1.029223113, 0.019992438))
            Line((1.029223113, 0.019992438), (1.028673195, 0))
        make_face()
    chanfrein1_piece_6 = extrude(amount=6.972039171, mode=Mode.PRIVATE)
    chanfrein1_piece_6 = split(chanfrein1_piece_6, bisect_by=Plane(origin=(-35.486019586, -8.088094973, -1.6), z_dir=(0, 0, 1)), keep=Keep.TOP, mode=Mode.PRIVATE)
    add(chanfrein1_piece_6, mode=Mode.SUBTRACT)

    # Esquisse9 → Enlèv. mat.-Extru.2 (cut)
    with BuildSketch(Plane.ZY.offset(32.8)):
        with BuildLine():
            Line((-1.73, -7.413309524), (-1.73, -1.686690476))
            Line((-1.73, -1.686690476), (-2.536690476, -0.88))
            Line((-2.536690476, -0.88), (-3.54, -0.88))
            ThreePointArc((-3.54, -0.88), (-3.773345238, -0.976654762), (-3.87, -1.21))
            Line((-3.87, -1.21), (-3.87, -7.89))
            ThreePointArc((-3.87, -7.89), (-3.773345238, -8.123345238), (-3.54, -8.22))
            Line((-3.54, -8.22), (-2.536690476, -8.22))
            Line((-2.536690476, -8.22), (-1.73, -7.413309524))
        make_face()
        with Locations((-2.8, -4.55)):
            Rectangle(ESQUISSE9_W, ESQUISSE9_H, mode=Mode.SUBTRACT)
    extrude(amount=-ENL_V_MAT_EXTRU_2_DEPTH, mode=Mode.SUBTRACT)

    # Esquisse10 → Boss.-Extru.7 (add)
    with BuildSketch(Plane(origin=(0, 0, -1.6), x_dir=(-1, 0, 0), z_dir=(0, 0, -1))):
        with Locations((29.9, 5.55)):
            Rectangle(ESQUISSE10_W, ESQUISSE10_H)
        with Locations((25.6, 5.55)):
            Rectangle(ESQUISSE10_W, ESQUISSE10_H)
    extrude(amount=BOSS_EXTRU_7_DEPTH)

    # Esquisse11 → Boss.-Extru.8 (add)
    with BuildSketch(Plane(origin=(0, 0, -3.4), x_dir=(-1, 0, 0), z_dir=(0, 0, -1))):
        with Locations((25.6, 5.55)):
            Circle(ESQUISSE11_R)
        with Locations((29.9, 5.55)):
            Circle(ESQUISSE11_R)
    extrude(amount=BOSS_EXTRU_8_DEPTH)


with BuildPart() as body_2:
    # Esquisse2 → Boss.-Extru.2 (new body)
    with BuildSketch(Plane.XY):
        with Locations((19.25, 0)):
            Rectangle(ESQUISSE2_W, ESQUISSE2_H)
    extrude(amount=BOSS_EXTRU_2_DEPTH)

    # Esquisse3 → Boss.-Extru.3 (add)
    with BuildSketch(Plane.XY.offset(0.8)):
        with Locations((16.3, 0)):
            Rectangle(ESQUISSE3_W, ESQUISSE3_H)
    extrude(amount=BOSS_EXTRU_3_DEPTH)


with BuildPart() as body_3:
    # Esquisse4 → Boss.-Extru.4 (new body)
    with BuildSketch(Plane.XY):
        with Locations((-11.35, 0.8)):
            Rectangle(ESQUISSE4_W, ESQUISSE4_H)
    extrude(amount=BOSS_EXTRU_4_DEPTH)

    # Esquisse5 → Enlèv. mat.-Extru.1 (cut)
    with BuildSketch(Plane.XY.offset(1.26)):
        with Locations((-11.35, -0.54)):
            Rectangle(ESQUISSE5_W, ESQUISSE5_H)
    extrude(amount=-ENL_V_MAT_EXTRU_1_DEPTH, mode=Mode.SUBTRACT)

    # Déplacer la face2: a face moved outward by 0.09
    extrude(body_3.faces().sort_by_distance((-11.35, -0.54, 1.16))[0], amount=D_PLACER_LA_FACE2_BY, dir=(0, 0, 1))


with BuildPart() as body_4:
    # Esquisse12 → Boss.-Extru.9 (new body)
    with BuildSketch(Plane(origin=(0, 0, -1.6), x_dir=(-1, 0, 0), z_dir=(0, 0, -1))):
        Polygon((-3.5, 8.05), (-3.5, -11.25), (14.4, -11.25), (14.4, -13.75), (26, -13.75), (26, -9.75), (24.4, -9.75), (24.4, 2.05), (22.76436437, 2.05), (22.76436437, 8.05), align=None)
    extrude(amount=BOSS_EXTRU_9_DEPTH)


with BuildPart() as body_5:
    # Esquisse12 → Boss.-Extru.9 2 (new body)
    with BuildSketch(Plane(origin=(0, 0, -1.6), x_dir=(-1, 0, 0), z_dir=(0, 0, -1))):
        with Locations((-19.75, 1.55)):
            Rectangle(ESQUISSE12_W, ESQUISSE12_H)
    extrude(amount=BOSS_EXTRU_9_2_DEPTH)


solid = Compound([part.part, body_2.part, body_3.part, body_4.part, body_5.part])
